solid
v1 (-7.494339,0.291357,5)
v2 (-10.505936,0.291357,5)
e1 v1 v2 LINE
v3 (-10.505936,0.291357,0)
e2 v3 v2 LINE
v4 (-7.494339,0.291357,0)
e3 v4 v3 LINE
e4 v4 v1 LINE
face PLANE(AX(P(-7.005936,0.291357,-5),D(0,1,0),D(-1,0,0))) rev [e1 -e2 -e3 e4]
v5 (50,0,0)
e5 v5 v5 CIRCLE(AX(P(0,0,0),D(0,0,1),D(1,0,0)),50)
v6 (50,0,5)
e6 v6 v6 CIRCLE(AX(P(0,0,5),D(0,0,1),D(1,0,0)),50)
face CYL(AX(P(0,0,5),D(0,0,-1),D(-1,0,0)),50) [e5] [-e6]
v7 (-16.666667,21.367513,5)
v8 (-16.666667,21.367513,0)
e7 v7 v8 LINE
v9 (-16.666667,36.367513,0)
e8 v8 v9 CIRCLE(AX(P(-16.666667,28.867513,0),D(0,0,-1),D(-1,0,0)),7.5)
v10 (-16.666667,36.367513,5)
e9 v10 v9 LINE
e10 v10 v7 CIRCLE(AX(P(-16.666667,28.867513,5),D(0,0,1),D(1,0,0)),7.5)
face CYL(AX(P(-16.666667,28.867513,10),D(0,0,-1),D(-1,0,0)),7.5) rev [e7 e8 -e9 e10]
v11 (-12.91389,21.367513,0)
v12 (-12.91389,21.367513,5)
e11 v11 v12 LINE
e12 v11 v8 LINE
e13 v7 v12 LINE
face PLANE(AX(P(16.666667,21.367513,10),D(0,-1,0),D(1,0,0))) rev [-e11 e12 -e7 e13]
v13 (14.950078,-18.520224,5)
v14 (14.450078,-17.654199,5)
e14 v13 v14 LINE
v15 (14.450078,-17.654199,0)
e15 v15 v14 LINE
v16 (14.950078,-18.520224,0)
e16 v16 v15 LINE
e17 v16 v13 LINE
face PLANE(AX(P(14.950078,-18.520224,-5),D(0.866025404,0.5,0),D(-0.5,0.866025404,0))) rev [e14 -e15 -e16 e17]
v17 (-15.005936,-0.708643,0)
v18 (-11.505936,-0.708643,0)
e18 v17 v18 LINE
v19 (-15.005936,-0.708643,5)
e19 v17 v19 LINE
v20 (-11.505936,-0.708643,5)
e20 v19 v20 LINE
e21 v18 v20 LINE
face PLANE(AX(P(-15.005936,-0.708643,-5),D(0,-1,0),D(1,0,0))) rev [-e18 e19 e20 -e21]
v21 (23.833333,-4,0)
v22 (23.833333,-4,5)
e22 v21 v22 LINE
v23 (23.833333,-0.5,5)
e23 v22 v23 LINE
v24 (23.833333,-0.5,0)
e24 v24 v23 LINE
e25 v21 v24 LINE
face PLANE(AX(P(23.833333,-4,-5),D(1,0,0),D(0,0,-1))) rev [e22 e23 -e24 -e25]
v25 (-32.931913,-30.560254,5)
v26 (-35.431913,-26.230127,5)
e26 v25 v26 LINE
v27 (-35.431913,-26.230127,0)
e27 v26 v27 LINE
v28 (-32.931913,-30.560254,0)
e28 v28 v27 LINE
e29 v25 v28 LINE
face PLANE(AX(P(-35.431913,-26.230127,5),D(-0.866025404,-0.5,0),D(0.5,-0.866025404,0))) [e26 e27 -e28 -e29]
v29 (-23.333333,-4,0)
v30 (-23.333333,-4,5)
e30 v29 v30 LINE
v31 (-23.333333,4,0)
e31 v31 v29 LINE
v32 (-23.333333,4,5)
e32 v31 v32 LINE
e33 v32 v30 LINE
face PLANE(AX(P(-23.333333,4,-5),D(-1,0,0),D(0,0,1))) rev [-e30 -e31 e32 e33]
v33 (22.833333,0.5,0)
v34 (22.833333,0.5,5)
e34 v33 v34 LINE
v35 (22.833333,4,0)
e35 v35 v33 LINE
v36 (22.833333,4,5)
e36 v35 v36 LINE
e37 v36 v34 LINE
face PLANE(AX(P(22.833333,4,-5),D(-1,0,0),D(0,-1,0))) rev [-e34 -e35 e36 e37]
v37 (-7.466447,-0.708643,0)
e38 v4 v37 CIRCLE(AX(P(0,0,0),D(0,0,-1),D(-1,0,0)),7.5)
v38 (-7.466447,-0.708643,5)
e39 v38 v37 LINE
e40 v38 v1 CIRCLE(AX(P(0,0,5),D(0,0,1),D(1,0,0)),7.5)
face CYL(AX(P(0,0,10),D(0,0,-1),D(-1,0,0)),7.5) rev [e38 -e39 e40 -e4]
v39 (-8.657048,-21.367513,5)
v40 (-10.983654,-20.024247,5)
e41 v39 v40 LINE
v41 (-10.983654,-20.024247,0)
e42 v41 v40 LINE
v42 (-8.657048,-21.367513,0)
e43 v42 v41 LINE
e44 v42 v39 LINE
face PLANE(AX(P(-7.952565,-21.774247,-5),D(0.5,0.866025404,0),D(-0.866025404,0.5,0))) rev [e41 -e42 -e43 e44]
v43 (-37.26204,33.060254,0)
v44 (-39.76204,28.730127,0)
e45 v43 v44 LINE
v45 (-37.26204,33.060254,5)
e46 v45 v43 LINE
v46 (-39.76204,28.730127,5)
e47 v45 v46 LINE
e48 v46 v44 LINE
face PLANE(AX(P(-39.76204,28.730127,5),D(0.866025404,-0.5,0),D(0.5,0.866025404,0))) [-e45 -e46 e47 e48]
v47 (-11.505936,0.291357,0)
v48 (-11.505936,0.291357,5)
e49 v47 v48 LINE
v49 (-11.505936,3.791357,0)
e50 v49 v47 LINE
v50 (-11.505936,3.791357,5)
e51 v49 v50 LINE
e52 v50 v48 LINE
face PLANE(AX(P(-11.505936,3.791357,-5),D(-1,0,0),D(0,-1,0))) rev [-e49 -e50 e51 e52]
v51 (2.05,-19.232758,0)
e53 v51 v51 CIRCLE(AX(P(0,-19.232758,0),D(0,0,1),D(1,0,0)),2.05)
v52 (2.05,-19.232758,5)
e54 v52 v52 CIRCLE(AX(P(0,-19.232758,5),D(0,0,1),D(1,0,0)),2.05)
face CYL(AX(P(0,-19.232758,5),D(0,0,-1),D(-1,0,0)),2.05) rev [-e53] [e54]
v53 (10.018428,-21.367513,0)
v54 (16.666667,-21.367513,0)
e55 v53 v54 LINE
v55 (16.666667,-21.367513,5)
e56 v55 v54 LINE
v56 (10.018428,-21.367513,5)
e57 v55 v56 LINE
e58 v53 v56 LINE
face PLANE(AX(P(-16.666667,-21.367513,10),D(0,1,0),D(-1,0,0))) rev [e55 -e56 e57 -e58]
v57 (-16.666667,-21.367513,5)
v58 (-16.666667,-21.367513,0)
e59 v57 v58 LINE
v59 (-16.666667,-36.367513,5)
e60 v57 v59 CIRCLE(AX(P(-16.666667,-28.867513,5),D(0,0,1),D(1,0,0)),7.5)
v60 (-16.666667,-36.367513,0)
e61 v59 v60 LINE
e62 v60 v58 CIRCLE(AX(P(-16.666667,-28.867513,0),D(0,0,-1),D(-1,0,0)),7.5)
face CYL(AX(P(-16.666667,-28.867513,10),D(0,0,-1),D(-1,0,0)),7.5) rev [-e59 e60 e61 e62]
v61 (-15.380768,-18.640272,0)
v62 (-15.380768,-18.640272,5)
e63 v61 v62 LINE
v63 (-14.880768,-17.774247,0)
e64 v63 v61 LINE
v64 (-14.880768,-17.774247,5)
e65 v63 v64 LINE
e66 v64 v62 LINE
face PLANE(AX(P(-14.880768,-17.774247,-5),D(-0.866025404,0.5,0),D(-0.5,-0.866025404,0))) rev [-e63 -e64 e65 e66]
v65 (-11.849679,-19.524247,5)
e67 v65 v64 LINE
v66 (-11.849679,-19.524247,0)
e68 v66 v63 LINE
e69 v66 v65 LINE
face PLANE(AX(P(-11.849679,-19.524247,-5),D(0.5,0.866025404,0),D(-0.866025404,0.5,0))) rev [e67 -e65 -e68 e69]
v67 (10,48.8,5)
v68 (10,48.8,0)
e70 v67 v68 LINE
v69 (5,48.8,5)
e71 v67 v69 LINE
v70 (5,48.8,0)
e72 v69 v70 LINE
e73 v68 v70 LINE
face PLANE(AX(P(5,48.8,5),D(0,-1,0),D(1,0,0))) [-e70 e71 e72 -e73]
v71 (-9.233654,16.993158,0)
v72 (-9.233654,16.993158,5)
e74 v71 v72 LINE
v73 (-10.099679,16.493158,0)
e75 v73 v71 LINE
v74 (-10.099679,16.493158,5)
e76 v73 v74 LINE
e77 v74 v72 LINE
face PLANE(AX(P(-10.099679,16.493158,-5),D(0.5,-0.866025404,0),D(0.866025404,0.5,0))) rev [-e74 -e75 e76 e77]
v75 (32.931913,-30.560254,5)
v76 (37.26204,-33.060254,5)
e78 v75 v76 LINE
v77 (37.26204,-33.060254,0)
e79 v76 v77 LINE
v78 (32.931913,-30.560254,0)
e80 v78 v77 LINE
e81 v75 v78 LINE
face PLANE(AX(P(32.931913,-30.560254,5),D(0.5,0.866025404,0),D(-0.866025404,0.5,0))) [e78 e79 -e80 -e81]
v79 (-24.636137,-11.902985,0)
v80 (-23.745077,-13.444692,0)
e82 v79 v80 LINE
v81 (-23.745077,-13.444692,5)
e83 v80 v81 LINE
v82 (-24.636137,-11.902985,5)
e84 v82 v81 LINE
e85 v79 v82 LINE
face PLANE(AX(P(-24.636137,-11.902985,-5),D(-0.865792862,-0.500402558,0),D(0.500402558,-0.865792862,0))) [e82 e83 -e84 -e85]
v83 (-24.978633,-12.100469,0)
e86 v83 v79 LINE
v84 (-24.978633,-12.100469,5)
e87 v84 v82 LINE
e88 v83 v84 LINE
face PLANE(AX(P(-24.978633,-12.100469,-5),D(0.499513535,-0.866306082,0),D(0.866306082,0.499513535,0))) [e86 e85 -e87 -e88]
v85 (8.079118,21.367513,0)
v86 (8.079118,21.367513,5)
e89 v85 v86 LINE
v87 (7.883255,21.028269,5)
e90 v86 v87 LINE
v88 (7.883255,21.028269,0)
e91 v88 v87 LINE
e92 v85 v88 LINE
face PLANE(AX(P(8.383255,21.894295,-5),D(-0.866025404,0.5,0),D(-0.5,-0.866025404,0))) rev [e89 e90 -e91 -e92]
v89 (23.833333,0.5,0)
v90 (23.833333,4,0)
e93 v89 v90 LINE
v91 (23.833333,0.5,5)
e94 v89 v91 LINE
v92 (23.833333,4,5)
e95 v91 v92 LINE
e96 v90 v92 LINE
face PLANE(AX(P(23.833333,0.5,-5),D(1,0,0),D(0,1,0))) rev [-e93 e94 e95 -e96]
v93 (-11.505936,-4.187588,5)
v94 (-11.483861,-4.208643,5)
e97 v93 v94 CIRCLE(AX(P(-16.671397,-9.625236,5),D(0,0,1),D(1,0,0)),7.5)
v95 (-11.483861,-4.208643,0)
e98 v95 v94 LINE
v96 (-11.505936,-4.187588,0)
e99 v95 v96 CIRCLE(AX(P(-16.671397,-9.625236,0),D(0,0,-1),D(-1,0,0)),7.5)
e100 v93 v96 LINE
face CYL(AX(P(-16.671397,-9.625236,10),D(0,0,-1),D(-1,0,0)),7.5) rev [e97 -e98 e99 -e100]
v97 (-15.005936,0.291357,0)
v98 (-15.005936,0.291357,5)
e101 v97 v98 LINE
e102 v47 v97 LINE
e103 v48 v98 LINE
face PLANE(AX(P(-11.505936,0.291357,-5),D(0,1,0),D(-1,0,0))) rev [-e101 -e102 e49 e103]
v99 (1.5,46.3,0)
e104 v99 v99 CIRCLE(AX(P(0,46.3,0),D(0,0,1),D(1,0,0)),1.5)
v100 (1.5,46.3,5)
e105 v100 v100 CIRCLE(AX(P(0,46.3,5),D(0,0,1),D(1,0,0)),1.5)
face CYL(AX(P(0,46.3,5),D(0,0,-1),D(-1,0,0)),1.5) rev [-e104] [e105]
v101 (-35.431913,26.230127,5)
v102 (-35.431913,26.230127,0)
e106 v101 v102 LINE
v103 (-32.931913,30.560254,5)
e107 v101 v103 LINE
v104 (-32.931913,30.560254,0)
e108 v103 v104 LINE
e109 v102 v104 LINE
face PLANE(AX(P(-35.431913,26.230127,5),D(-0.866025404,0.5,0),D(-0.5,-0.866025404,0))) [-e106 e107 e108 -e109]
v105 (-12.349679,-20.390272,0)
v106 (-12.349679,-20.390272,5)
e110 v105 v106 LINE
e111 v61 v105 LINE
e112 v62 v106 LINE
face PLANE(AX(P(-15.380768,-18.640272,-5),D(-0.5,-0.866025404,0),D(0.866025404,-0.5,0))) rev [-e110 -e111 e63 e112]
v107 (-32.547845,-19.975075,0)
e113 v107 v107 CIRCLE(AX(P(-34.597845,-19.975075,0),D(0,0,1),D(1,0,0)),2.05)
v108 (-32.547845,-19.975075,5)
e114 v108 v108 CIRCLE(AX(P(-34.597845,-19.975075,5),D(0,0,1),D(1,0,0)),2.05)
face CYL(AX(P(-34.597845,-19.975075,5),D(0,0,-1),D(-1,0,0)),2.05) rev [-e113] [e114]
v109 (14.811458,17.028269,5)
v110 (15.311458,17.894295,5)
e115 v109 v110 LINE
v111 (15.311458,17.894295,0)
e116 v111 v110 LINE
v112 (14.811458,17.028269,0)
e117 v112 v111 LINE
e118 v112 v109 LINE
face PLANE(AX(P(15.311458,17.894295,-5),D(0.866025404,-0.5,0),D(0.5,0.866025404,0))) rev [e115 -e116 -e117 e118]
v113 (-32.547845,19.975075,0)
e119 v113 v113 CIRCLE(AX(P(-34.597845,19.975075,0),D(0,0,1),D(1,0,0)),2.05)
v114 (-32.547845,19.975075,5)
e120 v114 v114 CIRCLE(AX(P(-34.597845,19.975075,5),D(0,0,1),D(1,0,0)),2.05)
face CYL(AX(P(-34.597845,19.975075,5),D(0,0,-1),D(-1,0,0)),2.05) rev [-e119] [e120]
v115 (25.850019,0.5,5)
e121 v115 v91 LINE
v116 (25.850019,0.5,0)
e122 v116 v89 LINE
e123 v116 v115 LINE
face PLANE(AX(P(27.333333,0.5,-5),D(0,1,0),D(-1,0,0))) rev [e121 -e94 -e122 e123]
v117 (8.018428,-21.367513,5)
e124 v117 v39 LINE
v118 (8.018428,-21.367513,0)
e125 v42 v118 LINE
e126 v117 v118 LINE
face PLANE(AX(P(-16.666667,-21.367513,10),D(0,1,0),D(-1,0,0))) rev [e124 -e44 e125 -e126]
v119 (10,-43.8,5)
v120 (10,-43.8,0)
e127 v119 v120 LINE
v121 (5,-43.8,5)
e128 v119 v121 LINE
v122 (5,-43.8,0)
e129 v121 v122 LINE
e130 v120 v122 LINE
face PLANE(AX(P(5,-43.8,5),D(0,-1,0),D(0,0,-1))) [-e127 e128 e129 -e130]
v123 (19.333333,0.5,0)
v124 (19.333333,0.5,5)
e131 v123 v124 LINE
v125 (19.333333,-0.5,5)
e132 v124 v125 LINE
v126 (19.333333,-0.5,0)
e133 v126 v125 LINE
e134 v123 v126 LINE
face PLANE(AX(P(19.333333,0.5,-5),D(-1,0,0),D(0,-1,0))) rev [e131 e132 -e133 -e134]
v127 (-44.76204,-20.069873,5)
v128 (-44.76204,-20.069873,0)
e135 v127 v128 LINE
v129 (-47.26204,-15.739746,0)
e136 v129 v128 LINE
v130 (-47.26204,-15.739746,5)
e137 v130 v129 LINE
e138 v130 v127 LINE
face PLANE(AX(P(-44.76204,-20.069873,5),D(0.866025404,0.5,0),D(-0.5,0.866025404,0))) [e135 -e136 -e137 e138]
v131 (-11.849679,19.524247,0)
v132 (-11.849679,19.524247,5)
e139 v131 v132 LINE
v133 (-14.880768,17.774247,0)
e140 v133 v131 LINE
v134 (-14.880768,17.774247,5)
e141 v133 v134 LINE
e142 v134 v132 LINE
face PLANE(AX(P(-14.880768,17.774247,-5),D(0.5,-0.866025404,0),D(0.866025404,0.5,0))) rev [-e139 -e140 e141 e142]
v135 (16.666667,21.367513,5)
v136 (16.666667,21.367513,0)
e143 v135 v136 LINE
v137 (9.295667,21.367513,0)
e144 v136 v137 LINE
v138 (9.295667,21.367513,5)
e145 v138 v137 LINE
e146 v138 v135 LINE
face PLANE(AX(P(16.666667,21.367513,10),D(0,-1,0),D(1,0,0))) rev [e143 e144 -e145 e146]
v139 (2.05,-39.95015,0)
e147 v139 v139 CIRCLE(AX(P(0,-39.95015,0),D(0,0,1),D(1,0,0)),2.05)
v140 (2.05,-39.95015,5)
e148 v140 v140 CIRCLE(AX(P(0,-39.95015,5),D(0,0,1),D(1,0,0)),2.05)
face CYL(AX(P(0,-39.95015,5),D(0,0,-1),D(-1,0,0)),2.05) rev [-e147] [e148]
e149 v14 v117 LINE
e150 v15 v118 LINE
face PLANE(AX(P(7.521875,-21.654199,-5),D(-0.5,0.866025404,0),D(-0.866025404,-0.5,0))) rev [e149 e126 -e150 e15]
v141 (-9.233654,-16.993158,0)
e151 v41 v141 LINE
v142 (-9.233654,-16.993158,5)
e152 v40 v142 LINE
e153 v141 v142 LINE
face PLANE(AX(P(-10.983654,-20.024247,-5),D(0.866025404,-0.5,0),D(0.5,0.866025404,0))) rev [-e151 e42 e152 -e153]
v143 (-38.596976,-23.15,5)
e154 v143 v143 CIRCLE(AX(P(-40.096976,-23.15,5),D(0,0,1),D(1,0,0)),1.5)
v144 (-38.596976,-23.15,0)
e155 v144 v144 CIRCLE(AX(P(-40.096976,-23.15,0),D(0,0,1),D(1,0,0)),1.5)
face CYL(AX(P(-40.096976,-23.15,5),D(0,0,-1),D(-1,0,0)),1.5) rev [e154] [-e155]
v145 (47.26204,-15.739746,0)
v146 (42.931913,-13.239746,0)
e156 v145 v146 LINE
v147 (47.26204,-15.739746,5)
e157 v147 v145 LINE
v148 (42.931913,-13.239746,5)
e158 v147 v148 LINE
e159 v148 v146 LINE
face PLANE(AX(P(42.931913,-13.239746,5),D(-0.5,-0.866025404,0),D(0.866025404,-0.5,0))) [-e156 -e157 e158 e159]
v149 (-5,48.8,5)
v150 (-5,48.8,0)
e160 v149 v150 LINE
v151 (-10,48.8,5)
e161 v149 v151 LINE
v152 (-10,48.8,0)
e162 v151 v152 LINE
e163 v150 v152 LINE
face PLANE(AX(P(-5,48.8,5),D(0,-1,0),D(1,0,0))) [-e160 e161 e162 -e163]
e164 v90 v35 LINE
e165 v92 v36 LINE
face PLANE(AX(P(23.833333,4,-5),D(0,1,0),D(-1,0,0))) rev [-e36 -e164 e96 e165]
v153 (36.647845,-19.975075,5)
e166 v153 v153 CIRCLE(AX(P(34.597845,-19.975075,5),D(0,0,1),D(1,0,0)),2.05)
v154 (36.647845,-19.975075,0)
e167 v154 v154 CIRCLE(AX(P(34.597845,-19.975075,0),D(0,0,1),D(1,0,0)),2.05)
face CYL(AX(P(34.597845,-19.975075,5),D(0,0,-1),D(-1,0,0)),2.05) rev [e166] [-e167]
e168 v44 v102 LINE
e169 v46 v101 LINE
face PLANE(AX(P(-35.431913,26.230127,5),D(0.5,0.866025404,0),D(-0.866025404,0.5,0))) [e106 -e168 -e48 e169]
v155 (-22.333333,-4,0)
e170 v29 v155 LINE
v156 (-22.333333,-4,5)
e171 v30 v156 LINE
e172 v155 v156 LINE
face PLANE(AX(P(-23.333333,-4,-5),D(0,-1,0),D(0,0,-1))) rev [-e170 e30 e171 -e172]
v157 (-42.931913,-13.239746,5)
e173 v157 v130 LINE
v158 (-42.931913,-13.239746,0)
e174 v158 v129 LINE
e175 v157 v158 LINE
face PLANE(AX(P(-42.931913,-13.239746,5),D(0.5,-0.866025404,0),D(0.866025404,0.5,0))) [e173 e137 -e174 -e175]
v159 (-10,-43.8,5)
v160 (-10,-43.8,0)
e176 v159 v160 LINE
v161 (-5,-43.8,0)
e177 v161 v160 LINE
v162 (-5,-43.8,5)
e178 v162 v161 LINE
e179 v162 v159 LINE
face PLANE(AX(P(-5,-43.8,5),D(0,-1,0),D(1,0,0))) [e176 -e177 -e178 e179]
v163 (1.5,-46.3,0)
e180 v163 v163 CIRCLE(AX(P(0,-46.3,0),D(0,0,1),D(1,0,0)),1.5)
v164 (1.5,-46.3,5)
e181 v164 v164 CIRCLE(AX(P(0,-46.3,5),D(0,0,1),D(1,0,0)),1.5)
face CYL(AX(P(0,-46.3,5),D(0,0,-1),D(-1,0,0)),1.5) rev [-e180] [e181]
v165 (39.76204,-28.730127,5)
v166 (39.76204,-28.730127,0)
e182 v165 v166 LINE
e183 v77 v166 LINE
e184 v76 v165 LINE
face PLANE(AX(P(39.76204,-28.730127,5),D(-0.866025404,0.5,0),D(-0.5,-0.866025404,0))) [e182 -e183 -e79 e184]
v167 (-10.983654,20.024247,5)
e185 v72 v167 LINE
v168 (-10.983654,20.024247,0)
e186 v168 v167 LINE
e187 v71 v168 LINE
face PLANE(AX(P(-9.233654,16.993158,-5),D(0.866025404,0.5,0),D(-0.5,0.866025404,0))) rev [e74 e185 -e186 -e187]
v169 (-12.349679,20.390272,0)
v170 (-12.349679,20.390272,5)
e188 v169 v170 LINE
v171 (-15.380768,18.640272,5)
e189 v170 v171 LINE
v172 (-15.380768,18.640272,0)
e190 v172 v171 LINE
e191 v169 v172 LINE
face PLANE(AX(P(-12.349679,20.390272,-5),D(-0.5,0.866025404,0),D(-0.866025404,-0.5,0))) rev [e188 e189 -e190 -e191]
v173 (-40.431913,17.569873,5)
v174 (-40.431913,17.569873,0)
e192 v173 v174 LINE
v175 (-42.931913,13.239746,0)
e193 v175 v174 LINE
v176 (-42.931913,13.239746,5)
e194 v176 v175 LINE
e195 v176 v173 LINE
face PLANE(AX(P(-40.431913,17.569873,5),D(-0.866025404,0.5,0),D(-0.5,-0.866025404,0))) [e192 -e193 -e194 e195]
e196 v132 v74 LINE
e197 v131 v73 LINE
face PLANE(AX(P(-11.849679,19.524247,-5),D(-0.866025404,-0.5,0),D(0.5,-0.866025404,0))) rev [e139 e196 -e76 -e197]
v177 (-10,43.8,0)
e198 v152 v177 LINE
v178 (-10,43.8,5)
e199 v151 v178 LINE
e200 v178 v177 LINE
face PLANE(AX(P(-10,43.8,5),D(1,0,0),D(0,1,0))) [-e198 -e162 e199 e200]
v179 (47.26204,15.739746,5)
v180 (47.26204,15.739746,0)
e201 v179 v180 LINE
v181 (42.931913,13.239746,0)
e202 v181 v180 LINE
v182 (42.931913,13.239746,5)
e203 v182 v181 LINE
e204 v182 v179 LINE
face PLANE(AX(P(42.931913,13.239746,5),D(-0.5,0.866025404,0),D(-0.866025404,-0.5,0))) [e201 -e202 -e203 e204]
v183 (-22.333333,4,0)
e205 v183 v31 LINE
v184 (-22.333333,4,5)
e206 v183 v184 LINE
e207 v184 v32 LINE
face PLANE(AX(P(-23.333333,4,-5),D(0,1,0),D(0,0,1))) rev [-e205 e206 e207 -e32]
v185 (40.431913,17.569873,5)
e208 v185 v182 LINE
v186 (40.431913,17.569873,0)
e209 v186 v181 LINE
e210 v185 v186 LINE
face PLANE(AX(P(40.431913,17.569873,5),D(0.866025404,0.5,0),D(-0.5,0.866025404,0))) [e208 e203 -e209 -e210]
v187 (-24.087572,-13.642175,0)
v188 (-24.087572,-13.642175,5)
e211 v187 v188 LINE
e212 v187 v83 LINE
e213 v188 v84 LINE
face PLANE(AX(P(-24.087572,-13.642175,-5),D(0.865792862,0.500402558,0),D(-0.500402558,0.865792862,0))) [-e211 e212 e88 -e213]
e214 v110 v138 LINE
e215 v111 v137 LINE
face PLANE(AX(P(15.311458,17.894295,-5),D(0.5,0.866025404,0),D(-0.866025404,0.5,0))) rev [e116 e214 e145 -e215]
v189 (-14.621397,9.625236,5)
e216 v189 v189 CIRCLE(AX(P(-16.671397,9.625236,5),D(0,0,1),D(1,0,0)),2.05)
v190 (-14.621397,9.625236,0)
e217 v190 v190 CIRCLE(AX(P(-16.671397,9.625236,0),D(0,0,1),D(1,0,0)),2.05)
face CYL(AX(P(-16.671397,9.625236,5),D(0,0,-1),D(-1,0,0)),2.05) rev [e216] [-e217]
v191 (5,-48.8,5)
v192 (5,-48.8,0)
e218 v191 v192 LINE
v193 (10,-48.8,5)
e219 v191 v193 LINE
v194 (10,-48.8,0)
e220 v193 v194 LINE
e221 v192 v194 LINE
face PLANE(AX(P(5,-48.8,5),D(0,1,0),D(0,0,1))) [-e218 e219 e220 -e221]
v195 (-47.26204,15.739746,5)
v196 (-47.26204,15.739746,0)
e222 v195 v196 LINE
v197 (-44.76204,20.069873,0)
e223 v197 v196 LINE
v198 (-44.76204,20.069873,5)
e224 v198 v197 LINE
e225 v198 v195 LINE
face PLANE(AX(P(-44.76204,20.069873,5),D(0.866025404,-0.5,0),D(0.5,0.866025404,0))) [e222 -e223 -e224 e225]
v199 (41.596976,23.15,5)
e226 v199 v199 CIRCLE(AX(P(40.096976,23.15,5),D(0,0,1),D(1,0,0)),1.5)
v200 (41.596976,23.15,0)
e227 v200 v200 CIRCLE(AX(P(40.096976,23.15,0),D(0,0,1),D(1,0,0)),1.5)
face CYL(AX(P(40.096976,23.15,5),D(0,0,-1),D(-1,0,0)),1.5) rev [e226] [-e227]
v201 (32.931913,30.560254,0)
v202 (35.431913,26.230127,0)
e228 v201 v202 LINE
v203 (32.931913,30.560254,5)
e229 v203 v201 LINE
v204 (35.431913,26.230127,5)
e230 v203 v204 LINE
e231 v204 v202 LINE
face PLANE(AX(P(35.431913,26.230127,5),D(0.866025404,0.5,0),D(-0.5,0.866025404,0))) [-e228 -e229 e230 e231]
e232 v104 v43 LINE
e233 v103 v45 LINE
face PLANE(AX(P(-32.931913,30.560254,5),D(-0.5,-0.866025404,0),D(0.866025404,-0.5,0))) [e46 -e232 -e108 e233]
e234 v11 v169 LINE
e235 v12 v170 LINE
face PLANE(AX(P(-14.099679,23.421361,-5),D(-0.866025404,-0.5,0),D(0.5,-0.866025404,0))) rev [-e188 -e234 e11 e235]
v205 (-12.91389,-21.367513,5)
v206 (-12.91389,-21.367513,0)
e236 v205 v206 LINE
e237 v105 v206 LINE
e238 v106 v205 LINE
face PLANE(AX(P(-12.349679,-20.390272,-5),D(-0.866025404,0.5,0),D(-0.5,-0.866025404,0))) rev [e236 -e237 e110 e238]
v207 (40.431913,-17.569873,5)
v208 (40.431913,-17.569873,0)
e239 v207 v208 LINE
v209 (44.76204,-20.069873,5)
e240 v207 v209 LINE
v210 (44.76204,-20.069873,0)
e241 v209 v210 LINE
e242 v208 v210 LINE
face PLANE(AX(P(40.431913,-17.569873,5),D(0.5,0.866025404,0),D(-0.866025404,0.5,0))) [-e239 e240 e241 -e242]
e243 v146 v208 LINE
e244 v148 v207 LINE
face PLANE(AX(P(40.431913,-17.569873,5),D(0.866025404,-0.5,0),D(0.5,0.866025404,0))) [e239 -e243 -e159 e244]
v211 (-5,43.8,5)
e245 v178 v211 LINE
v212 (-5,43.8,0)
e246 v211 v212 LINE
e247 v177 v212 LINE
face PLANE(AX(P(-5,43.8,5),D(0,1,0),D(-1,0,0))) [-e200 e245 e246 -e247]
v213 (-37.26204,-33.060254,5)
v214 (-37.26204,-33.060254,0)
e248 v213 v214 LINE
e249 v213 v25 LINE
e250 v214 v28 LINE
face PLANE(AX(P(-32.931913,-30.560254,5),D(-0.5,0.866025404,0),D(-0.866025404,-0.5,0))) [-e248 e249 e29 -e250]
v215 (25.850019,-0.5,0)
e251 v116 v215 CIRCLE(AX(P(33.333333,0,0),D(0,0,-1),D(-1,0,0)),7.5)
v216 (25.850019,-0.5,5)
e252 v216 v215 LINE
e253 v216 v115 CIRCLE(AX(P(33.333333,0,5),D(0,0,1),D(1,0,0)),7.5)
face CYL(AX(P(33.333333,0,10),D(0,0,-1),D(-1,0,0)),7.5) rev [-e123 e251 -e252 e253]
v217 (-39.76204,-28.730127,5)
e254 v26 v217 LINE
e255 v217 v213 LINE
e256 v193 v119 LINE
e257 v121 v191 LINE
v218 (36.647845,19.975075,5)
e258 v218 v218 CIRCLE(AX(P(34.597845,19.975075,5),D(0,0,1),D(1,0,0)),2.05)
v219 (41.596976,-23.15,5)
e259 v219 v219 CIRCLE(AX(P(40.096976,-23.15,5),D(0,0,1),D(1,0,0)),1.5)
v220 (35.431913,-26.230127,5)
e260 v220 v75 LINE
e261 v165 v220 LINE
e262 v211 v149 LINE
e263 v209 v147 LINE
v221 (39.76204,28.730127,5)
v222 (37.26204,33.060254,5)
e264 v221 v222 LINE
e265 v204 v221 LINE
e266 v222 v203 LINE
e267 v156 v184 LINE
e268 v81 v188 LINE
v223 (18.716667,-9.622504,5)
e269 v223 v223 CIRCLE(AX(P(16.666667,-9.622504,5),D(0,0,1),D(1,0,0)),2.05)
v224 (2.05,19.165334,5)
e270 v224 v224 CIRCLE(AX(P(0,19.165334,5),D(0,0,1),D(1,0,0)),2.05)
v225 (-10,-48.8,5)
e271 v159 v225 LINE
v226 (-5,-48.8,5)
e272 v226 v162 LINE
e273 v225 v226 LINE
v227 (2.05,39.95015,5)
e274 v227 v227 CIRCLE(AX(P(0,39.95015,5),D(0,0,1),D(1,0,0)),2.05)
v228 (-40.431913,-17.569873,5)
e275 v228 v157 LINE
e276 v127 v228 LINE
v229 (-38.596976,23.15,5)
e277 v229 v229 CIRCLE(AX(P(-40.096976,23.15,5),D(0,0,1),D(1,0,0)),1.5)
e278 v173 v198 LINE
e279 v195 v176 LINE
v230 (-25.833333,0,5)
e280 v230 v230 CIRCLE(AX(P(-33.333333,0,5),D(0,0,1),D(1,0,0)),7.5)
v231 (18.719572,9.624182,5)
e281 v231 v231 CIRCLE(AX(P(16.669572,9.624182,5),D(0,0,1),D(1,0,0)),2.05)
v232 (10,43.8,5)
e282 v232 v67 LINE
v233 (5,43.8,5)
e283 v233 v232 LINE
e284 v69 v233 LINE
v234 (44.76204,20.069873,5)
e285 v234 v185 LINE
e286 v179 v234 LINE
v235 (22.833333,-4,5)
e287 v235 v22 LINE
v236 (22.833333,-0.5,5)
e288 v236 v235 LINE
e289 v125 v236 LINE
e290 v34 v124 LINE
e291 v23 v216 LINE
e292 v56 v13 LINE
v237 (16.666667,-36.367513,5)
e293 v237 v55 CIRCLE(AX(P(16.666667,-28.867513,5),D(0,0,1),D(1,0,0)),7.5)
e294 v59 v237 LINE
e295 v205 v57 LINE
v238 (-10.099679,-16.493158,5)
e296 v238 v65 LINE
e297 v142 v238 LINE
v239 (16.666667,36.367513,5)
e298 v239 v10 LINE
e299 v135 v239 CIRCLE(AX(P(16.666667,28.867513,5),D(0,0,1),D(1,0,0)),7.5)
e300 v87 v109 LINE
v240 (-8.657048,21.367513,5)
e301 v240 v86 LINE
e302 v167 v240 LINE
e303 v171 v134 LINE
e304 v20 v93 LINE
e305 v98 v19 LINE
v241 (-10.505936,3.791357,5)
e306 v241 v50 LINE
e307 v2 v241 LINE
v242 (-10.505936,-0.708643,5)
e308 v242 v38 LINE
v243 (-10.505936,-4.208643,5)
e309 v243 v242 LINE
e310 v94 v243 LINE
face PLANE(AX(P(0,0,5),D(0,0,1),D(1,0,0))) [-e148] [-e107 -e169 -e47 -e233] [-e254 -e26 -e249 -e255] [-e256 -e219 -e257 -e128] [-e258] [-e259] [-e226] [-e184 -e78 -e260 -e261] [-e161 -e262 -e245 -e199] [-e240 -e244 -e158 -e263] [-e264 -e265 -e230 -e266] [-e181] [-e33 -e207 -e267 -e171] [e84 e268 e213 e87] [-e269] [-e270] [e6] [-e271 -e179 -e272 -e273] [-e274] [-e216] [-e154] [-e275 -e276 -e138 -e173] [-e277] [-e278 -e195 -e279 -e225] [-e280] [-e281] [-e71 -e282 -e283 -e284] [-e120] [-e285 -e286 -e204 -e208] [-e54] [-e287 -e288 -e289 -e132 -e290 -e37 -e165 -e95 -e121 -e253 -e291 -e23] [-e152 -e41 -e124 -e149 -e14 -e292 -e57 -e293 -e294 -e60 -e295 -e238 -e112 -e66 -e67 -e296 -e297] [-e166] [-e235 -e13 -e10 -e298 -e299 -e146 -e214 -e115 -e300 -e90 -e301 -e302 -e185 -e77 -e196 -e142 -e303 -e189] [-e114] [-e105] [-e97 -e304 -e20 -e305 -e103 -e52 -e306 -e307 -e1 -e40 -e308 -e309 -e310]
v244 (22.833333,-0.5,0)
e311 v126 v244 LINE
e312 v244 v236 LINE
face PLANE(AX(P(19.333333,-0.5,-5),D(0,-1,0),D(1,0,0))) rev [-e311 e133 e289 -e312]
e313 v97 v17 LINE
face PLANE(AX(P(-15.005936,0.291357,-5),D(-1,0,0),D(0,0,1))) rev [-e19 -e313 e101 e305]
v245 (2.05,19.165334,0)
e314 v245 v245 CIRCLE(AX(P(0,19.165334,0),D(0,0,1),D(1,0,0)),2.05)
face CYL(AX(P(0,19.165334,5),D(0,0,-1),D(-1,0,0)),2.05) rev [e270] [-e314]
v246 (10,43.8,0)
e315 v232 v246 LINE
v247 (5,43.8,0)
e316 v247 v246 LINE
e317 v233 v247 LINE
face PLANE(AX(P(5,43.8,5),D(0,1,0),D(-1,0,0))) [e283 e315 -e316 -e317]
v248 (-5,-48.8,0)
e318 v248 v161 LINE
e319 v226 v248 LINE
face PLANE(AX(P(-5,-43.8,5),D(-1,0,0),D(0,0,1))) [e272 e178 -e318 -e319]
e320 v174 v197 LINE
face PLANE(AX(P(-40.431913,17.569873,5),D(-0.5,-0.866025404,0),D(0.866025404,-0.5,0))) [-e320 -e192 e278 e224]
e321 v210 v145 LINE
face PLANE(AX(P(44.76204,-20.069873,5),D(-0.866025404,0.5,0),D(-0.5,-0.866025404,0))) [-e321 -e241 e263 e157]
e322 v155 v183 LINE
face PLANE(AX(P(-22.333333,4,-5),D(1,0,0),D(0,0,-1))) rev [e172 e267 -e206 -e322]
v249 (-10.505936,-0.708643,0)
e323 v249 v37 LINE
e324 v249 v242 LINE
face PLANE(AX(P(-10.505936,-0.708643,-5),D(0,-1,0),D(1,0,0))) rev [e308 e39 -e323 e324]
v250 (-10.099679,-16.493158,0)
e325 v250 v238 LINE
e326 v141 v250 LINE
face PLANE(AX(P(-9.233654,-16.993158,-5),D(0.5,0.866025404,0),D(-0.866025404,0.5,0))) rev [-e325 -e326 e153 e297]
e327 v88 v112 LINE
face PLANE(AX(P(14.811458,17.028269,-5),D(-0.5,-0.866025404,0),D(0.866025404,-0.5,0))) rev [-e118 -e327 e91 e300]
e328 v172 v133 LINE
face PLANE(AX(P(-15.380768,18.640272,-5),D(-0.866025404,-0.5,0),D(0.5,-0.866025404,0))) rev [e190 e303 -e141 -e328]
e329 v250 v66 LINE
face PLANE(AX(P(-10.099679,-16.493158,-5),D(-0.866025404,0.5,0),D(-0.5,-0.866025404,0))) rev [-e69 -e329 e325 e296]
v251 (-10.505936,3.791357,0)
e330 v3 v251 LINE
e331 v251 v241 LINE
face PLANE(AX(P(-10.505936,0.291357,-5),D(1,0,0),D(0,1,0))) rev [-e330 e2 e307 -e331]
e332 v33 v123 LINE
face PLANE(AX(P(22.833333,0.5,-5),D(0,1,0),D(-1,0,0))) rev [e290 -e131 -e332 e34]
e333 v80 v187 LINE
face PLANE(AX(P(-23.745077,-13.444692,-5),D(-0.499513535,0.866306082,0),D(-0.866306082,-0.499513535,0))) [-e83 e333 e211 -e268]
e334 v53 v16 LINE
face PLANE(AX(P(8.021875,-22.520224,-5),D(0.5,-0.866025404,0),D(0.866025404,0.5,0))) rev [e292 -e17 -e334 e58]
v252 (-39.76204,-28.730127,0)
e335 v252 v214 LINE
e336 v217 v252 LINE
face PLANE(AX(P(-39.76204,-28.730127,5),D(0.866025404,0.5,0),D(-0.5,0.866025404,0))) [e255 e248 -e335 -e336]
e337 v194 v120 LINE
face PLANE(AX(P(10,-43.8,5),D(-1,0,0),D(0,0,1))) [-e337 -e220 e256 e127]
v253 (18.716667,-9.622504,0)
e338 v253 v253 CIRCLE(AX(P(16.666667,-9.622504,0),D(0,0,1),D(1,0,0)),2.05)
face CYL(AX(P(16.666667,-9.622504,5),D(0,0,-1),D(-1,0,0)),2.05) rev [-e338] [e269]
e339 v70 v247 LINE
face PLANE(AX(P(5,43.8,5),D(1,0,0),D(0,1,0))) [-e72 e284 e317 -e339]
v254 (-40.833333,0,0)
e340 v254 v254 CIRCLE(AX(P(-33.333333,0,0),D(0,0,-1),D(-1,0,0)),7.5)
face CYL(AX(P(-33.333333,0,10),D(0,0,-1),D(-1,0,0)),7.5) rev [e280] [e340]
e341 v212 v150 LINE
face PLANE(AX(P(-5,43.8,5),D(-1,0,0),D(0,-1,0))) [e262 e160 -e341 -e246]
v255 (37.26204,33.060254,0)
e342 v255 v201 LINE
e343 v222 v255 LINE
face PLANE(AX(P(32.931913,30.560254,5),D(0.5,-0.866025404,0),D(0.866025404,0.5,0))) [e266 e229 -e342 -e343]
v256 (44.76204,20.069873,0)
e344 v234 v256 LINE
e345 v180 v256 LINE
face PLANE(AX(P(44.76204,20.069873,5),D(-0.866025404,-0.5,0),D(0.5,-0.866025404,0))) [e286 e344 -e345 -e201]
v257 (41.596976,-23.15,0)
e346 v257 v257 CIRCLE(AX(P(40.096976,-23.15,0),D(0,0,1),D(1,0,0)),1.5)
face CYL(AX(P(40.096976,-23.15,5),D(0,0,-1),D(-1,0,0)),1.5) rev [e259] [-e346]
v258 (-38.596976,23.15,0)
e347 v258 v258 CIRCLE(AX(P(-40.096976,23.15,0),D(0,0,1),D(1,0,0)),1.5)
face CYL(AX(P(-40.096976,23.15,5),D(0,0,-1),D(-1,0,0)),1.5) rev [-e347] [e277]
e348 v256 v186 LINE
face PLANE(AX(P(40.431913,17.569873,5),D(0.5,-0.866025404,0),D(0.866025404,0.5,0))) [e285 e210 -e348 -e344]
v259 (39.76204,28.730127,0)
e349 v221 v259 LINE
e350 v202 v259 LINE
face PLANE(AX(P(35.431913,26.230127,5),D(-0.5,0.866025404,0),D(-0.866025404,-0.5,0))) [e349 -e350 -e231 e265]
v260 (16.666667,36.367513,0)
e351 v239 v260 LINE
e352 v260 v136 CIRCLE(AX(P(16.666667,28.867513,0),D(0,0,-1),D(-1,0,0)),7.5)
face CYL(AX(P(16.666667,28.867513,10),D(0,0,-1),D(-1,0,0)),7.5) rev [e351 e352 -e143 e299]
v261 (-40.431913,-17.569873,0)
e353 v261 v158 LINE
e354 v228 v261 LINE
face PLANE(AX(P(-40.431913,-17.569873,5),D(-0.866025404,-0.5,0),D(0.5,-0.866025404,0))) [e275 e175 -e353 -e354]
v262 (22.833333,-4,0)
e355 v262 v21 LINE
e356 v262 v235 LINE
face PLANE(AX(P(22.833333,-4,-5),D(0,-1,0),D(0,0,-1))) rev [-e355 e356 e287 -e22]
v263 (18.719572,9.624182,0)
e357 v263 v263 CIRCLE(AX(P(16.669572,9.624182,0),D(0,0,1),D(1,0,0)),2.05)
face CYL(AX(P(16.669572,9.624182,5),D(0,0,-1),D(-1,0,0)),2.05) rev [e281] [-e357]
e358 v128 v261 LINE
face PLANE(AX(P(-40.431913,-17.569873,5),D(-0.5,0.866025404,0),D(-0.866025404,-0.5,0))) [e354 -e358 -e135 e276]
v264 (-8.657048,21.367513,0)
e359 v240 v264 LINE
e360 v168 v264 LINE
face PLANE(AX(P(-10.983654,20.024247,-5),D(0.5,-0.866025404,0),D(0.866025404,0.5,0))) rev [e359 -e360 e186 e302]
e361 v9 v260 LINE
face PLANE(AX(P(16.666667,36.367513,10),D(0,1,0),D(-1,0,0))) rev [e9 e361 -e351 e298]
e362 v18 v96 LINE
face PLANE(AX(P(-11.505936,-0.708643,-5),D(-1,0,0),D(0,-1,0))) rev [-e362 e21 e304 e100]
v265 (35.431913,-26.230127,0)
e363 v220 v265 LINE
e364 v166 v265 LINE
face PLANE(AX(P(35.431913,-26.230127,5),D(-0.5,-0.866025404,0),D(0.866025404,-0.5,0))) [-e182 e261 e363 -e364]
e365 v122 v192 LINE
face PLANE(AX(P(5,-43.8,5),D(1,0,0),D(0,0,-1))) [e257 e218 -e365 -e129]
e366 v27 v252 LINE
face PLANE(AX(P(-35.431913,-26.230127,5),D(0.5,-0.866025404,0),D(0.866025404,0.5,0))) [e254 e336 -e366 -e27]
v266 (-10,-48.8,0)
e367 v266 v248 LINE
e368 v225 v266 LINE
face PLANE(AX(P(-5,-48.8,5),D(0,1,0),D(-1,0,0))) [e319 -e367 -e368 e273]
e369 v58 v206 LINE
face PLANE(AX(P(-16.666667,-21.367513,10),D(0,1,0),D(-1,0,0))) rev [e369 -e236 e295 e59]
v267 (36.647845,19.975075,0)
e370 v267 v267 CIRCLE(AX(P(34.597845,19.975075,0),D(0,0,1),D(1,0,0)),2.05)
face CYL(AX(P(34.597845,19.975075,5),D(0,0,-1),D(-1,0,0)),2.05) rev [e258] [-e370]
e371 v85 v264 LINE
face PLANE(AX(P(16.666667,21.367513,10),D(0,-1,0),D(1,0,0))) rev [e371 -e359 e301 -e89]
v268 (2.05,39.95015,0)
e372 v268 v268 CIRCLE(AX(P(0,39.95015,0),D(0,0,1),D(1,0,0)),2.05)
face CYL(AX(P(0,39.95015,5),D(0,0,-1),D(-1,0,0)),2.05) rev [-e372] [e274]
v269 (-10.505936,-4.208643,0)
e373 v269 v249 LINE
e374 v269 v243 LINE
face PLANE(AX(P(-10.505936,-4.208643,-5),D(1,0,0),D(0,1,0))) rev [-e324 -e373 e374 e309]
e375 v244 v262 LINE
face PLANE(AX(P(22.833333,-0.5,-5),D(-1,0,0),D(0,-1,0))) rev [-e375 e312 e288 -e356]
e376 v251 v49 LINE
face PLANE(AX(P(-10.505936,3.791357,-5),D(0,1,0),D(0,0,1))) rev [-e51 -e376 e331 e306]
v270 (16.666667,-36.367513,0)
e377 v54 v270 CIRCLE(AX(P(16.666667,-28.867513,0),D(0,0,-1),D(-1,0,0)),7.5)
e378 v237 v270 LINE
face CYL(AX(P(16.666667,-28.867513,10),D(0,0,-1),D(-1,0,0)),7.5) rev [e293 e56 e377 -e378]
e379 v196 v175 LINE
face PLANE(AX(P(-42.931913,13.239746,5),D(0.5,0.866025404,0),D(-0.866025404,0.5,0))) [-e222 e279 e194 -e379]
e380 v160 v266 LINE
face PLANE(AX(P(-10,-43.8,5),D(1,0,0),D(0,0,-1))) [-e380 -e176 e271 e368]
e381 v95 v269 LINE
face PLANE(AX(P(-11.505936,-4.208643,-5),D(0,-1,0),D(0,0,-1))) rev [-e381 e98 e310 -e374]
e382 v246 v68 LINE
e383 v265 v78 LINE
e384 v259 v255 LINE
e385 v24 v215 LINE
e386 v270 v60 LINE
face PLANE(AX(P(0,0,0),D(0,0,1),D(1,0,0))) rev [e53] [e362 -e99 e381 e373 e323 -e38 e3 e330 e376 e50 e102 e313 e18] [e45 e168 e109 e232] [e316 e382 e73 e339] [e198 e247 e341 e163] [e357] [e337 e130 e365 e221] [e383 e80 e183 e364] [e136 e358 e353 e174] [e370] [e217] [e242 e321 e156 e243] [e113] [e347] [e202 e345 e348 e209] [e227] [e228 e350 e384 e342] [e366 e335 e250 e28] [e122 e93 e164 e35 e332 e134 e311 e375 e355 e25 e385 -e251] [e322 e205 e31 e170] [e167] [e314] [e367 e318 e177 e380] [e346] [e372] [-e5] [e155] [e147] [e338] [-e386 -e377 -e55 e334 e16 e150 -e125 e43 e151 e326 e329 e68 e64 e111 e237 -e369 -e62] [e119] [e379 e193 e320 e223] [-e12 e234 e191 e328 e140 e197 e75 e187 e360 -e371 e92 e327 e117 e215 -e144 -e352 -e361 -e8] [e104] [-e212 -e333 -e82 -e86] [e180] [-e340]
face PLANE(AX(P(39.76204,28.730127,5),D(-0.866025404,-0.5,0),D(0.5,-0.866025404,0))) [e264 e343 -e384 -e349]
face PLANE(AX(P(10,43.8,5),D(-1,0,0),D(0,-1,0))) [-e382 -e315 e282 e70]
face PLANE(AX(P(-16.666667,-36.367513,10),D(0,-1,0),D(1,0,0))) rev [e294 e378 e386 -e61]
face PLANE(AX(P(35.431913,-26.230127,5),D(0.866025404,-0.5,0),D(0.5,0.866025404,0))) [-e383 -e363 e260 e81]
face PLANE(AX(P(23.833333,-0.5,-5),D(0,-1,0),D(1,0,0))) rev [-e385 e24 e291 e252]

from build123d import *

# Parameters (mm, degrees)
BOSS_EXTRU_1_OUTLINE_R   = 50
BOSS_EXTRU_1_OUTLINE_W   = 5
BOSS_EXTRU_1_OUTLINE_H   = 5
BOSS_EXTRU_1_OUTLINE_R_2 = 2.05
BOSS_EXTRU_1_OUTLINE_R_3 = 1.5
BOSS_EXTRU_1_DEPTH       = 5
SKETCH3_W                = 1
SKETCH3_H                = 8
CUT_EXTRUDE2_DEPTH       = 10
SKETCH4_R                = 7.5
CUT_EXTRUDE3_DEPTH       = 10


# Read off the part's stored shape, not the designer's step: Boss.-Extru.1
with BuildPart() as part:
    # Boss.-Extru.1 outline → Boss.-Extru.1 (new body)
    with BuildSketch(Plane.XY):
        Circle(BOSS_EXTRU_1_OUTLINE_R)
        Polygon((-37.262039705, -33.060254038), (-39.762039705, -28.730127019), (-35.431912686, -26.230127019), (-32.931912686, -30.560254038), align=None, mode=Mode.SUBTRACT)
        with Locations((-7.5, -46.3)):
            Rectangle(BOSS_EXTRU_1_OUTLINE_W, BOSS_EXTRU_1_OUTLINE_H, mode=Mode.SUBTRACT)
        with Locations((-16.666666667, -28.867513459)):
            Circle(BOSS_EXTRU_1_OUTLINE_R_2, mode=Mode.SUBTRACT)
        with Locations((-40.096976195, -23.15)):
            Circle(BOSS_EXTRU_1_OUTLINE_R_3, mode=Mode.SUBTRACT)
        Polygon((-42.931912686, -13.239745962), (-40.431912686, -17.569872981), (-44.762039705, -20.069872981), (-47.262039705, -15.739745962), align=None, mode=Mode.SUBTRACT)
        with Locations((-34.597845014, -19.975075132)):
            Circle(BOSS_EXTRU_1_OUTLINE_R_2, mode=Mode.SUBTRACT)
        with Locations((-16.671397033, -9.625235564)):
            Circle(BOSS_EXTRU_1_OUTLINE_R_2, mode=Mode.SUBTRACT)
        with Locations((0, -46.3)):
            Circle(BOSS_EXTRU_1_OUTLINE_R_3, mode=Mode.SUBTRACT)
        with Locations((7.5, -46.3)):
            Rectangle(BOSS_EXTRU_1_OUTLINE_W, BOSS_EXTRU_1_OUTLINE_H, mode=Mode.SUBTRACT)
        with Locations((0, -39.950150265)):
            Circle(BOSS_EXTRU_1_OUTLINE_R_2, mode=Mode.SUBTRACT)
        with Locations((16.666666667, -28.867513459)):
            Circle(BOSS_EXTRU_1_OUTLINE_R_2, mode=Mode.SUBTRACT)
        Polygon((32.931912686, -30.560254038), (35.431912686, -26.230127019), (39.762039705, -28.730127019), (37.262039705, -33.060254038), align=None, mode=Mode.SUBTRACT)
        with Locations((0, -19.232757636)):
            Circle(BOSS_EXTRU_1_OUTLINE_R_2, mode=Mode.SUBTRACT)
        with Locations((16.666666667, -9.622504487)):
            Circle(BOSS_EXTRU_1_OUTLINE_R_2, mode=Mode.SUBTRACT)
        with Locations((34.597845014, -19.975075132)):
            Circle(BOSS_EXTRU_1_OUTLINE_R_2, mode=Mode.SUBTRACT)
        with Locations((40.096976195, -23.15)):
            Circle(BOSS_EXTRU_1_OUTLINE_R_3, mode=Mode.SUBTRACT)
        Polygon((47.262039705, -15.739745962), (44.762039705, -20.069872981), (40.431912686, -17.569872981), (42.931912686, -13.239745962), align=None, mode=Mode.SUBTRACT)
        with Locations((-33.333333333, 0)):
            Circle(BOSS_EXTRU_1_OUTLINE_R_2, mode=Mode.SUBTRACT)
        Polygon((-47.262039705, 15.739745962), (-44.762039705, 20.069872981), (-40.431912686, 17.569872981), (-42.931912686, 13.239745962), align=None, mode=Mode.SUBTRACT)
        with Locations((-40.096976195, 23.15)):
            Circle(BOSS_EXTRU_1_OUTLINE_R_3, mode=Mode.SUBTRACT)
        with Locations((-34.597845014, 19.975075132)):
            Circle(BOSS_EXTRU_1_OUTLINE_R_2, mode=Mode.SUBTRACT)
        with Locations((-16.671397032, 9.625235564)):
            Circle(BOSS_EXTRU_1_OUTLINE_R_2, mode=Mode.SUBTRACT)
        Polygon((-32.931912686, 30.560254038), (-35.431912686, 26.230127019), (-39.762039705, 28.730127019), (-37.262039705, 33.060254038), align=None, mode=Mode.SUBTRACT)
        with Locations((-16.666666667, 28.867513459)):
            Circle(BOSS_EXTRU_1_OUTLINE_R_2, mode=Mode.SUBTRACT)
        with Locations((-7.5, 46.3)):
            Rectangle(BOSS_EXTRU_1_OUTLINE_W, BOSS_EXTRU_1_OUTLINE_H, mode=Mode.SUBTRACT)
        Circle(BOSS_EXTRU_1_OUTLINE_R_2, mode=Mode.SUBTRACT)
        with Locations((16.669571796, 9.624181764)):
            Circle(BOSS_EXTRU_1_OUTLINE_R_2, mode=Mode.SUBTRACT)
        with Locations((0, 19.165334425)):
            Circle(BOSS_EXTRU_1_OUTLINE_R_2, mode=Mode.SUBTRACT)
        with Locations((33.333333333, 0)):
            Circle(BOSS_EXTRU_1_OUTLINE_R_2, mode=Mode.SUBTRACT)
        with Locations((34.597845014, 19.975075133)):
            Circle(BOSS_EXTRU_1_OUTLINE_R_2, mode=Mode.SUBTRACT)
        Polygon((42.931912686, 13.239745962), (40.431912686, 17.569872981), (44.762039705, 20.069872981), (47.262039705, 15.739745962), align=None, mode=Mode.SUBTRACT)
        with Locations((40.096976195, 23.15)):
            Circle(BOSS_EXTRU_1_OUTLINE_R_3, mode=Mode.SUBTRACT)
        with Locations((16.666666667, 28.867513459)):
            Circle(BOSS_EXTRU_1_OUTLINE_R_2, mode=Mode.SUBTRACT)
        with Locations((0, 39.950150265)):
            Circle(BOSS_EXTRU_1_OUTLINE_R_2, mode=Mode.SUBTRACT)
        with Locations((0, 46.3)):
            Circle(BOSS_EXTRU_1_OUTLINE_R_3, mode=Mode.SUBTRACT)
        with Locations((7.5, 46.3)):
            Rectangle(BOSS_EXTRU_1_OUTLINE_W, BOSS_EXTRU_1_OUTLINE_H, mode=Mode.SUBTRACT)
        Polygon((37.262039705, 33.060254038), (39.762039705, 28.730127019), (35.431912686, 26.230127019), (32.931912686, 30.560254038), align=None, mode=Mode.SUBTRACT)
    extrude(amount=BOSS_EXTRU_1_DEPTH)

    # Sketch3 → Cut-Extrude2 (cut)
    with BuildSketch(Plane.XY.offset(5)):
        with Locations((-22.833333333, 0)):
            Rectangle(SKETCH3_W, SKETCH3_H)
        Polygon((-13.233653965, 23.921361037), (-14.099679369, 23.421361037), (-12.349679369, 20.390272124), (-15.380768282, 18.640272124), (-14.880768282, 17.77424672), (-11.849679369, 19.52424672), (-10.099679369, 16.493157806), (-9.233653965, 16.993157806), (-10.983653965, 20.02424672), (-7.952565052, 21.77424672), (-8.452565052, 22.640272124), (-11.483653965, 20.890272124), align=None)
        Polygon((15.311458483, 17.894294813), (14.811458483, 17.028269409), (7.883255253, 21.028269409), (8.383255253, 21.894294813), align=None)
        Polygon((8.02187485, -22.52022403), (7.52187485, -21.654198627), (14.450078081, -17.654198627), (14.950078081, -18.52022403), align=None)
        Polygon((27.333333333, -0.5), (27.333333333, 0.5), (23.833333333, 0.5), (23.833333333, 4), (22.833333333, 4), (22.833333333, 0.5), (19.333333333, 0.5), (19.333333333, -0.5), (22.833333333, -0.5), (22.833333333, -4), (23.833333333, -4), (23.833333333, -0.5), align=None)
        Polygon((-14.099679369, -23.421361037), (-13.233653965, -23.921361037), (-11.483653965, -20.890272124), (-8.452565052, -22.640272124), (-7.952565052, -21.77424672), (-10.983653965, -20.02424672), (-9.233653965, -16.993157806), (-10.099679369, -16.493157806), (-11.849679369, -19.52424672), (-14.880768282, -17.77424672), (-15.380768282, -18.640272124), (-12.349679369, -20.390272124), align=None)
        Polygon((-7.005935602, -0.708643072), (-7.005935602, 0.291356928), (-10.505935602, 0.291356928), (-10.505935602, 3.791356928), (-11.505935602, 3.791356928), (-11.505935602, 0.291356928), (-15.005935602, 0.291356928), (-15.005935602, -0.708643072), (-11.505935602, -0.708643072), (-11.505935602, -4.208643072), (-10.505935602, -4.208643072), (-10.505935602, -0.708643072), align=None)
        Polygon((-24.636137397, -11.902985286), (-23.7450767, -13.444692017), (-24.087572192, -13.64217549), (-24.97863289, -12.100468759), align=None)
    extrude(amount=-CUT_EXTRUDE2_DEPTH, mode=Mode.SUBTRACT)

    # Sketch4 → Cut-Extrude3 (cut)
    with BuildSketch(Plane(origin=(0, 0, 0), x_dir=(-1, 0, 0), z_dir=(0, 0, -1))):
        with Locations((-33.333333333, 0)):
            Circle(SKETCH4_R)
        Circle(SKETCH4_R)
        with Locations((33.333333333, 0)):
            Circle(SKETCH4_R)
        with Locations((16.671397033, -9.625235564)):
            Circle(SKETCH4_R)
        with BuildLine():
            Line((16.666666667, -36.367513459), (-16.666666667, -36.367513459))
            ThreePointArc((-16.666666667, -36.367513459), (-24.166666667, -28.867513459), (-16.666666667, -21.367513459))
            Line((-16.666666667, -21.367513459), (16.666666667, -21.367513459))
            ThreePointArc((16.666666667, -21.367513459), (24.166666667, -28.867513459), (16.666666667, -36.367513459))
        make_face()
        with BuildLine():
            Line((-16.666666667, 36.367513459), (16.666666667, 36.367513459))
            ThreePointArc((16.666666667, 36.367513459), (24.166666667, 28.867513459), (16.666666667, 21.367513459))
            Line((16.666666667, 21.367513459), (-16.666666667, 21.367513459))
            ThreePointArc((-16.666666667, 21.367513459), (-24.166666667, 28.867513459), (-16.666666667, 36.367513459))
        make_face()
    extrude(amount=-CUT_EXTRUDE3_DEPTH, mode=Mode.SUBTRACT)


with BuildPart() as cut_extrude3_kept_piece:
    # of the separate pieces the step leaves, the one the design keeps (cut_extrude3_pieces_kept)
    add(part.part.solids().sort_by_distance((50, 0, 0))[0])


solid = cut_extrude3_kept_piece.part
